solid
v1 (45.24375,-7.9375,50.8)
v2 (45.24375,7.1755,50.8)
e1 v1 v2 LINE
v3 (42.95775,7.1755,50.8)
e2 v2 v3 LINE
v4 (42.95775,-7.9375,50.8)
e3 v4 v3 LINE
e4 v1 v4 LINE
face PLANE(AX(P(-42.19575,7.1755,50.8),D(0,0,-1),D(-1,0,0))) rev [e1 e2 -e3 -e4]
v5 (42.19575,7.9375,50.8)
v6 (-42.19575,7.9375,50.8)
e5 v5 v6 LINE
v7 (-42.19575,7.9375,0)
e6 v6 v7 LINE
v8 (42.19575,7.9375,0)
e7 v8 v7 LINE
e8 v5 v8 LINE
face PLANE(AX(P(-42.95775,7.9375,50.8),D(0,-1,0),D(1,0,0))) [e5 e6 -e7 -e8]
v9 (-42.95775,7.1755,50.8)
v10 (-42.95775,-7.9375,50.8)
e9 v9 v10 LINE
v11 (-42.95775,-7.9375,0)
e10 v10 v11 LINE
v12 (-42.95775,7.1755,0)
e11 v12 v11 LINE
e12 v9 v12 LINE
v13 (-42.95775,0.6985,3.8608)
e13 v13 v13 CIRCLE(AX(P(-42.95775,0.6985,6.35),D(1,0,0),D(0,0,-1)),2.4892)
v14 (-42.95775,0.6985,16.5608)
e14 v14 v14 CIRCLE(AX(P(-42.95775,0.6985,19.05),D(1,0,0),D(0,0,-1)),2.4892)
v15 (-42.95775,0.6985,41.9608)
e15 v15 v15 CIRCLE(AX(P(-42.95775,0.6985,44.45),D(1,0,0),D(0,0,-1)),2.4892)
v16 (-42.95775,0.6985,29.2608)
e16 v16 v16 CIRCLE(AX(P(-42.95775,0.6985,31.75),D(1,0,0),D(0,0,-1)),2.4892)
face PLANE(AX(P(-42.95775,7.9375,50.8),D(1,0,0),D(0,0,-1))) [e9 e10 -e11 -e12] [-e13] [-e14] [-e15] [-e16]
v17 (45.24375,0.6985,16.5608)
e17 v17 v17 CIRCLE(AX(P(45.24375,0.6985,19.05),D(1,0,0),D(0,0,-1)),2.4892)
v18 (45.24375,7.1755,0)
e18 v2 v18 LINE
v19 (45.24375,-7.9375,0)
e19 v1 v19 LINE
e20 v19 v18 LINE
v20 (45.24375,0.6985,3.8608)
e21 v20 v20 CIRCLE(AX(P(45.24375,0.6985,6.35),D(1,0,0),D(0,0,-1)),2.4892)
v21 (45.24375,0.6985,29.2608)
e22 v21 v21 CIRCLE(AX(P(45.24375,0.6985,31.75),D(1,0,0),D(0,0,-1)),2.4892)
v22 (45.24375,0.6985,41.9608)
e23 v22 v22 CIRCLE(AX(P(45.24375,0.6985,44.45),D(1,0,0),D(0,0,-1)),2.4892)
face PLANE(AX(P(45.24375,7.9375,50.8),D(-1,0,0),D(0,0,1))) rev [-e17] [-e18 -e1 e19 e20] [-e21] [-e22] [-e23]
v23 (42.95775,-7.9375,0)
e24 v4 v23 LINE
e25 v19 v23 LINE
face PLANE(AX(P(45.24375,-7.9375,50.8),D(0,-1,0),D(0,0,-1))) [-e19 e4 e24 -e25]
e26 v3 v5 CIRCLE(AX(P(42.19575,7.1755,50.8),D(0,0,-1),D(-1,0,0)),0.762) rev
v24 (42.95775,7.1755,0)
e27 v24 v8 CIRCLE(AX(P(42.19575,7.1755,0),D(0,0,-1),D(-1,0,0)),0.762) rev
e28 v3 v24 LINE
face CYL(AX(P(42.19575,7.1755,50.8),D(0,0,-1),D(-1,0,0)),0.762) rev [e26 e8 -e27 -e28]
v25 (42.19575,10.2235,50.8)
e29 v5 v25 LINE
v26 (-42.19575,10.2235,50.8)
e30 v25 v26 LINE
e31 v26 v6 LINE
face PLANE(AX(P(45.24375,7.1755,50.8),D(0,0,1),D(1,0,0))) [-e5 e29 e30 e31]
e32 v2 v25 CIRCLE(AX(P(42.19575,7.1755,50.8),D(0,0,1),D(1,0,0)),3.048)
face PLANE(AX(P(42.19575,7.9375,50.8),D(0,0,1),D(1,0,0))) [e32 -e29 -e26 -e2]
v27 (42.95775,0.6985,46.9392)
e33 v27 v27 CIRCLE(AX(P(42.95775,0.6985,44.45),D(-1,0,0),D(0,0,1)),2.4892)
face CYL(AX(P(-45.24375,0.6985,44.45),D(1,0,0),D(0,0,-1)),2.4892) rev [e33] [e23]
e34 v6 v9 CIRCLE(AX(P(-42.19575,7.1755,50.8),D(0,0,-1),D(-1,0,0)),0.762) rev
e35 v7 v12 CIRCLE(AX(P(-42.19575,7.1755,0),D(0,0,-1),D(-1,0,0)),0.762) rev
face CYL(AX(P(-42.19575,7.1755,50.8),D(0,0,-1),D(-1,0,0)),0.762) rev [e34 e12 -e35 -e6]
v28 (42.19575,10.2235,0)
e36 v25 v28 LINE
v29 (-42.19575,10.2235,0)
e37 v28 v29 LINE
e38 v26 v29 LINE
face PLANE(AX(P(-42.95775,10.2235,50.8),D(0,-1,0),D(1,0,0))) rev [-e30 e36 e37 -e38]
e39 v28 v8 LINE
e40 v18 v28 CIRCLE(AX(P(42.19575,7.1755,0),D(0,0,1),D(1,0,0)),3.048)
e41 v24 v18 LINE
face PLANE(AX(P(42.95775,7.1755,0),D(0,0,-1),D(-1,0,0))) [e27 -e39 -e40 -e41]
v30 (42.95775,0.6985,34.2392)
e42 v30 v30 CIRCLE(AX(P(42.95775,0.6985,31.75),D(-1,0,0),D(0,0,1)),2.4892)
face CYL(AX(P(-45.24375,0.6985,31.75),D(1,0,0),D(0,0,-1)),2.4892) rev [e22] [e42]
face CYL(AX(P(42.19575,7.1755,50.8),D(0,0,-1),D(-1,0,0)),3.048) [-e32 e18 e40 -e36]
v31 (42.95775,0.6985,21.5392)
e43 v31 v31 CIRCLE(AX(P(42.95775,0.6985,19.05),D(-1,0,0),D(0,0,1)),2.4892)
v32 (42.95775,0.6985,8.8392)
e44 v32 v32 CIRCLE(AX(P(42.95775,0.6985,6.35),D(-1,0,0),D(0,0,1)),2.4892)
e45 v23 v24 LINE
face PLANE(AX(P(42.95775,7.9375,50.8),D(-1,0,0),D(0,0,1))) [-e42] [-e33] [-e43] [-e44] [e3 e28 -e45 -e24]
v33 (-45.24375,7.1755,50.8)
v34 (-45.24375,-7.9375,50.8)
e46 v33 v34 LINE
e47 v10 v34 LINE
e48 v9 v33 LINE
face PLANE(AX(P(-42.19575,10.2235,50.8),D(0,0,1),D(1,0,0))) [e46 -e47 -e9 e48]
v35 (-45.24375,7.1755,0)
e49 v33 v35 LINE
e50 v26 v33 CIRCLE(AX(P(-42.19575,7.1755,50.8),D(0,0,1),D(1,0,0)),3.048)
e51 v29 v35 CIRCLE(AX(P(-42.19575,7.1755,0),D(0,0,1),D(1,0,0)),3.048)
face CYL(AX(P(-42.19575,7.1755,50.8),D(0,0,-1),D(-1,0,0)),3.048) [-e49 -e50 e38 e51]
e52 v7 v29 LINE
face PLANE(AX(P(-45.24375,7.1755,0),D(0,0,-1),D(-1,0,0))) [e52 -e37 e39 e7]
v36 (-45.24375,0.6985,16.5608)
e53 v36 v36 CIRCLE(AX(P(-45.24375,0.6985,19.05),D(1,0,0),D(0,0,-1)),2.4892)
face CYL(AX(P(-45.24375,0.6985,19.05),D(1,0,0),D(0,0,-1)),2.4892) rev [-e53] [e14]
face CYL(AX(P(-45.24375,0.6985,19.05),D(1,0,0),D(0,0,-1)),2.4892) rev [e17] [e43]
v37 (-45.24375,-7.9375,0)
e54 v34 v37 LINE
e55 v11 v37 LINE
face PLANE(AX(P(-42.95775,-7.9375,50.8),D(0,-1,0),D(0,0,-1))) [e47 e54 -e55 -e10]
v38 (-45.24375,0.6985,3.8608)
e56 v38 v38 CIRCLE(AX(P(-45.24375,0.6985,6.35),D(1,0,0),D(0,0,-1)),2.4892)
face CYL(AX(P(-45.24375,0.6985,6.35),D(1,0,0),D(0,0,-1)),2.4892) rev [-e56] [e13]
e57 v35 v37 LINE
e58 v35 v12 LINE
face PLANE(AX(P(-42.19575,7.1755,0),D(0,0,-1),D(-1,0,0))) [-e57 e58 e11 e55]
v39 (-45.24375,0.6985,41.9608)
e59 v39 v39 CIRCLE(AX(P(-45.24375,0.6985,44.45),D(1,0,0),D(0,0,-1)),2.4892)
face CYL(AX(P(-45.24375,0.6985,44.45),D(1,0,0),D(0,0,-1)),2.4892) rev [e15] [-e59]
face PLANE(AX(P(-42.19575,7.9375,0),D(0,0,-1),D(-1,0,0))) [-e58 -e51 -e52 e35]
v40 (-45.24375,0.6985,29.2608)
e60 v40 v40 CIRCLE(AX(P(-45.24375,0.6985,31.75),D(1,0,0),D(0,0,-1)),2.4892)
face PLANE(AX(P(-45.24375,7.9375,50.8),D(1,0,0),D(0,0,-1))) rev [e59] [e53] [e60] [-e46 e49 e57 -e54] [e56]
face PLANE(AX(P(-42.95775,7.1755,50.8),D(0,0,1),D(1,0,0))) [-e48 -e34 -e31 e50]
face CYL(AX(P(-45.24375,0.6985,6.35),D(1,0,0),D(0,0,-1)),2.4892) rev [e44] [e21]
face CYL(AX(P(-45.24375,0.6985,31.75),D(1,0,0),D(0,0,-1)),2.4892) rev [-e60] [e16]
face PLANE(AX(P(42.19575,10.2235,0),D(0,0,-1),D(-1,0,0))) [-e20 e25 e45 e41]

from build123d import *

# Parameters (mm, degrees)
BASE_FLANGE1_DEPTH      = 50.8
CUT_EXTRUDE1_DEPTH      = 69.790674268
CUT_EXTRUDE1_DEPTH_BACK = 69.790674268
SKETCH3_R               = 2.4892


# Sheet-metal steps are written as plain solids
with BuildPart() as part:
    # Sketch1 → Base-Flange1 (new body)
    with BuildSketch(Plane.XY):
        with BuildLine():
            Line((-42.95775, -7.9375), (-42.95775, 7.1755))
            ThreePointArc((-42.95775, 7.1755), (-42.734565367, 7.714315367), (-42.19575, 7.9375))
            Line((-42.19575, 7.9375), (42.19575, 7.9375))
            ThreePointArc((42.19575, 7.9375), (42.734565367, 7.714315367), (42.95775, 7.1755))
            Line((42.95775, 7.1755), (42.95775, -7.9375))
            Line((42.95775, -7.9375), (45.24375, -7.9375))
            Line((45.24375, -7.9375), (45.24375, 7.1755))
            ThreePointArc((45.24375, 7.1755), (44.351011469, 9.330761469), (42.19575, 10.2235))
            Line((42.19575, 10.2235), (-42.19575, 10.2235))
            ThreePointArc((-42.19575, 10.2235), (-44.351011469, 9.330761469), (-45.24375, 7.1755))
            Line((-45.24375, 7.1755), (-45.24375, -7.9375))
            Line((-45.24375, -7.9375), (-42.95775, -7.9375))
        make_face()
    extrude(amount=BASE_FLANGE1_DEPTH)

    # Sketch3 → Cut-Extrude1 (cut, two sides: drawn at the far end of the back side and taken through both)
    with BuildSketch(Plane(origin=(0, 0, 0), x_dir=(0, 0, -1), z_dir=(1, 0, 0)).offset(-CUT_EXTRUDE1_DEPTH_BACK)):
        with Locations((-6.35, 0.6985)):
            Circle(SKETCH3_R)
        with Locations((-19.05, 0.6985)):
            Circle(SKETCH3_R)
        with Locations((-31.75, 0.6985)):
            Circle(SKETCH3_R)
        with Locations((-44.45, 0.6985)):
            Circle(SKETCH3_R)
    extrude(amount=CUT_EXTRUDE1_DEPTH + CUT_EXTRUDE1_DEPTH_BACK, mode=Mode.SUBTRACT)


solid = part.part
